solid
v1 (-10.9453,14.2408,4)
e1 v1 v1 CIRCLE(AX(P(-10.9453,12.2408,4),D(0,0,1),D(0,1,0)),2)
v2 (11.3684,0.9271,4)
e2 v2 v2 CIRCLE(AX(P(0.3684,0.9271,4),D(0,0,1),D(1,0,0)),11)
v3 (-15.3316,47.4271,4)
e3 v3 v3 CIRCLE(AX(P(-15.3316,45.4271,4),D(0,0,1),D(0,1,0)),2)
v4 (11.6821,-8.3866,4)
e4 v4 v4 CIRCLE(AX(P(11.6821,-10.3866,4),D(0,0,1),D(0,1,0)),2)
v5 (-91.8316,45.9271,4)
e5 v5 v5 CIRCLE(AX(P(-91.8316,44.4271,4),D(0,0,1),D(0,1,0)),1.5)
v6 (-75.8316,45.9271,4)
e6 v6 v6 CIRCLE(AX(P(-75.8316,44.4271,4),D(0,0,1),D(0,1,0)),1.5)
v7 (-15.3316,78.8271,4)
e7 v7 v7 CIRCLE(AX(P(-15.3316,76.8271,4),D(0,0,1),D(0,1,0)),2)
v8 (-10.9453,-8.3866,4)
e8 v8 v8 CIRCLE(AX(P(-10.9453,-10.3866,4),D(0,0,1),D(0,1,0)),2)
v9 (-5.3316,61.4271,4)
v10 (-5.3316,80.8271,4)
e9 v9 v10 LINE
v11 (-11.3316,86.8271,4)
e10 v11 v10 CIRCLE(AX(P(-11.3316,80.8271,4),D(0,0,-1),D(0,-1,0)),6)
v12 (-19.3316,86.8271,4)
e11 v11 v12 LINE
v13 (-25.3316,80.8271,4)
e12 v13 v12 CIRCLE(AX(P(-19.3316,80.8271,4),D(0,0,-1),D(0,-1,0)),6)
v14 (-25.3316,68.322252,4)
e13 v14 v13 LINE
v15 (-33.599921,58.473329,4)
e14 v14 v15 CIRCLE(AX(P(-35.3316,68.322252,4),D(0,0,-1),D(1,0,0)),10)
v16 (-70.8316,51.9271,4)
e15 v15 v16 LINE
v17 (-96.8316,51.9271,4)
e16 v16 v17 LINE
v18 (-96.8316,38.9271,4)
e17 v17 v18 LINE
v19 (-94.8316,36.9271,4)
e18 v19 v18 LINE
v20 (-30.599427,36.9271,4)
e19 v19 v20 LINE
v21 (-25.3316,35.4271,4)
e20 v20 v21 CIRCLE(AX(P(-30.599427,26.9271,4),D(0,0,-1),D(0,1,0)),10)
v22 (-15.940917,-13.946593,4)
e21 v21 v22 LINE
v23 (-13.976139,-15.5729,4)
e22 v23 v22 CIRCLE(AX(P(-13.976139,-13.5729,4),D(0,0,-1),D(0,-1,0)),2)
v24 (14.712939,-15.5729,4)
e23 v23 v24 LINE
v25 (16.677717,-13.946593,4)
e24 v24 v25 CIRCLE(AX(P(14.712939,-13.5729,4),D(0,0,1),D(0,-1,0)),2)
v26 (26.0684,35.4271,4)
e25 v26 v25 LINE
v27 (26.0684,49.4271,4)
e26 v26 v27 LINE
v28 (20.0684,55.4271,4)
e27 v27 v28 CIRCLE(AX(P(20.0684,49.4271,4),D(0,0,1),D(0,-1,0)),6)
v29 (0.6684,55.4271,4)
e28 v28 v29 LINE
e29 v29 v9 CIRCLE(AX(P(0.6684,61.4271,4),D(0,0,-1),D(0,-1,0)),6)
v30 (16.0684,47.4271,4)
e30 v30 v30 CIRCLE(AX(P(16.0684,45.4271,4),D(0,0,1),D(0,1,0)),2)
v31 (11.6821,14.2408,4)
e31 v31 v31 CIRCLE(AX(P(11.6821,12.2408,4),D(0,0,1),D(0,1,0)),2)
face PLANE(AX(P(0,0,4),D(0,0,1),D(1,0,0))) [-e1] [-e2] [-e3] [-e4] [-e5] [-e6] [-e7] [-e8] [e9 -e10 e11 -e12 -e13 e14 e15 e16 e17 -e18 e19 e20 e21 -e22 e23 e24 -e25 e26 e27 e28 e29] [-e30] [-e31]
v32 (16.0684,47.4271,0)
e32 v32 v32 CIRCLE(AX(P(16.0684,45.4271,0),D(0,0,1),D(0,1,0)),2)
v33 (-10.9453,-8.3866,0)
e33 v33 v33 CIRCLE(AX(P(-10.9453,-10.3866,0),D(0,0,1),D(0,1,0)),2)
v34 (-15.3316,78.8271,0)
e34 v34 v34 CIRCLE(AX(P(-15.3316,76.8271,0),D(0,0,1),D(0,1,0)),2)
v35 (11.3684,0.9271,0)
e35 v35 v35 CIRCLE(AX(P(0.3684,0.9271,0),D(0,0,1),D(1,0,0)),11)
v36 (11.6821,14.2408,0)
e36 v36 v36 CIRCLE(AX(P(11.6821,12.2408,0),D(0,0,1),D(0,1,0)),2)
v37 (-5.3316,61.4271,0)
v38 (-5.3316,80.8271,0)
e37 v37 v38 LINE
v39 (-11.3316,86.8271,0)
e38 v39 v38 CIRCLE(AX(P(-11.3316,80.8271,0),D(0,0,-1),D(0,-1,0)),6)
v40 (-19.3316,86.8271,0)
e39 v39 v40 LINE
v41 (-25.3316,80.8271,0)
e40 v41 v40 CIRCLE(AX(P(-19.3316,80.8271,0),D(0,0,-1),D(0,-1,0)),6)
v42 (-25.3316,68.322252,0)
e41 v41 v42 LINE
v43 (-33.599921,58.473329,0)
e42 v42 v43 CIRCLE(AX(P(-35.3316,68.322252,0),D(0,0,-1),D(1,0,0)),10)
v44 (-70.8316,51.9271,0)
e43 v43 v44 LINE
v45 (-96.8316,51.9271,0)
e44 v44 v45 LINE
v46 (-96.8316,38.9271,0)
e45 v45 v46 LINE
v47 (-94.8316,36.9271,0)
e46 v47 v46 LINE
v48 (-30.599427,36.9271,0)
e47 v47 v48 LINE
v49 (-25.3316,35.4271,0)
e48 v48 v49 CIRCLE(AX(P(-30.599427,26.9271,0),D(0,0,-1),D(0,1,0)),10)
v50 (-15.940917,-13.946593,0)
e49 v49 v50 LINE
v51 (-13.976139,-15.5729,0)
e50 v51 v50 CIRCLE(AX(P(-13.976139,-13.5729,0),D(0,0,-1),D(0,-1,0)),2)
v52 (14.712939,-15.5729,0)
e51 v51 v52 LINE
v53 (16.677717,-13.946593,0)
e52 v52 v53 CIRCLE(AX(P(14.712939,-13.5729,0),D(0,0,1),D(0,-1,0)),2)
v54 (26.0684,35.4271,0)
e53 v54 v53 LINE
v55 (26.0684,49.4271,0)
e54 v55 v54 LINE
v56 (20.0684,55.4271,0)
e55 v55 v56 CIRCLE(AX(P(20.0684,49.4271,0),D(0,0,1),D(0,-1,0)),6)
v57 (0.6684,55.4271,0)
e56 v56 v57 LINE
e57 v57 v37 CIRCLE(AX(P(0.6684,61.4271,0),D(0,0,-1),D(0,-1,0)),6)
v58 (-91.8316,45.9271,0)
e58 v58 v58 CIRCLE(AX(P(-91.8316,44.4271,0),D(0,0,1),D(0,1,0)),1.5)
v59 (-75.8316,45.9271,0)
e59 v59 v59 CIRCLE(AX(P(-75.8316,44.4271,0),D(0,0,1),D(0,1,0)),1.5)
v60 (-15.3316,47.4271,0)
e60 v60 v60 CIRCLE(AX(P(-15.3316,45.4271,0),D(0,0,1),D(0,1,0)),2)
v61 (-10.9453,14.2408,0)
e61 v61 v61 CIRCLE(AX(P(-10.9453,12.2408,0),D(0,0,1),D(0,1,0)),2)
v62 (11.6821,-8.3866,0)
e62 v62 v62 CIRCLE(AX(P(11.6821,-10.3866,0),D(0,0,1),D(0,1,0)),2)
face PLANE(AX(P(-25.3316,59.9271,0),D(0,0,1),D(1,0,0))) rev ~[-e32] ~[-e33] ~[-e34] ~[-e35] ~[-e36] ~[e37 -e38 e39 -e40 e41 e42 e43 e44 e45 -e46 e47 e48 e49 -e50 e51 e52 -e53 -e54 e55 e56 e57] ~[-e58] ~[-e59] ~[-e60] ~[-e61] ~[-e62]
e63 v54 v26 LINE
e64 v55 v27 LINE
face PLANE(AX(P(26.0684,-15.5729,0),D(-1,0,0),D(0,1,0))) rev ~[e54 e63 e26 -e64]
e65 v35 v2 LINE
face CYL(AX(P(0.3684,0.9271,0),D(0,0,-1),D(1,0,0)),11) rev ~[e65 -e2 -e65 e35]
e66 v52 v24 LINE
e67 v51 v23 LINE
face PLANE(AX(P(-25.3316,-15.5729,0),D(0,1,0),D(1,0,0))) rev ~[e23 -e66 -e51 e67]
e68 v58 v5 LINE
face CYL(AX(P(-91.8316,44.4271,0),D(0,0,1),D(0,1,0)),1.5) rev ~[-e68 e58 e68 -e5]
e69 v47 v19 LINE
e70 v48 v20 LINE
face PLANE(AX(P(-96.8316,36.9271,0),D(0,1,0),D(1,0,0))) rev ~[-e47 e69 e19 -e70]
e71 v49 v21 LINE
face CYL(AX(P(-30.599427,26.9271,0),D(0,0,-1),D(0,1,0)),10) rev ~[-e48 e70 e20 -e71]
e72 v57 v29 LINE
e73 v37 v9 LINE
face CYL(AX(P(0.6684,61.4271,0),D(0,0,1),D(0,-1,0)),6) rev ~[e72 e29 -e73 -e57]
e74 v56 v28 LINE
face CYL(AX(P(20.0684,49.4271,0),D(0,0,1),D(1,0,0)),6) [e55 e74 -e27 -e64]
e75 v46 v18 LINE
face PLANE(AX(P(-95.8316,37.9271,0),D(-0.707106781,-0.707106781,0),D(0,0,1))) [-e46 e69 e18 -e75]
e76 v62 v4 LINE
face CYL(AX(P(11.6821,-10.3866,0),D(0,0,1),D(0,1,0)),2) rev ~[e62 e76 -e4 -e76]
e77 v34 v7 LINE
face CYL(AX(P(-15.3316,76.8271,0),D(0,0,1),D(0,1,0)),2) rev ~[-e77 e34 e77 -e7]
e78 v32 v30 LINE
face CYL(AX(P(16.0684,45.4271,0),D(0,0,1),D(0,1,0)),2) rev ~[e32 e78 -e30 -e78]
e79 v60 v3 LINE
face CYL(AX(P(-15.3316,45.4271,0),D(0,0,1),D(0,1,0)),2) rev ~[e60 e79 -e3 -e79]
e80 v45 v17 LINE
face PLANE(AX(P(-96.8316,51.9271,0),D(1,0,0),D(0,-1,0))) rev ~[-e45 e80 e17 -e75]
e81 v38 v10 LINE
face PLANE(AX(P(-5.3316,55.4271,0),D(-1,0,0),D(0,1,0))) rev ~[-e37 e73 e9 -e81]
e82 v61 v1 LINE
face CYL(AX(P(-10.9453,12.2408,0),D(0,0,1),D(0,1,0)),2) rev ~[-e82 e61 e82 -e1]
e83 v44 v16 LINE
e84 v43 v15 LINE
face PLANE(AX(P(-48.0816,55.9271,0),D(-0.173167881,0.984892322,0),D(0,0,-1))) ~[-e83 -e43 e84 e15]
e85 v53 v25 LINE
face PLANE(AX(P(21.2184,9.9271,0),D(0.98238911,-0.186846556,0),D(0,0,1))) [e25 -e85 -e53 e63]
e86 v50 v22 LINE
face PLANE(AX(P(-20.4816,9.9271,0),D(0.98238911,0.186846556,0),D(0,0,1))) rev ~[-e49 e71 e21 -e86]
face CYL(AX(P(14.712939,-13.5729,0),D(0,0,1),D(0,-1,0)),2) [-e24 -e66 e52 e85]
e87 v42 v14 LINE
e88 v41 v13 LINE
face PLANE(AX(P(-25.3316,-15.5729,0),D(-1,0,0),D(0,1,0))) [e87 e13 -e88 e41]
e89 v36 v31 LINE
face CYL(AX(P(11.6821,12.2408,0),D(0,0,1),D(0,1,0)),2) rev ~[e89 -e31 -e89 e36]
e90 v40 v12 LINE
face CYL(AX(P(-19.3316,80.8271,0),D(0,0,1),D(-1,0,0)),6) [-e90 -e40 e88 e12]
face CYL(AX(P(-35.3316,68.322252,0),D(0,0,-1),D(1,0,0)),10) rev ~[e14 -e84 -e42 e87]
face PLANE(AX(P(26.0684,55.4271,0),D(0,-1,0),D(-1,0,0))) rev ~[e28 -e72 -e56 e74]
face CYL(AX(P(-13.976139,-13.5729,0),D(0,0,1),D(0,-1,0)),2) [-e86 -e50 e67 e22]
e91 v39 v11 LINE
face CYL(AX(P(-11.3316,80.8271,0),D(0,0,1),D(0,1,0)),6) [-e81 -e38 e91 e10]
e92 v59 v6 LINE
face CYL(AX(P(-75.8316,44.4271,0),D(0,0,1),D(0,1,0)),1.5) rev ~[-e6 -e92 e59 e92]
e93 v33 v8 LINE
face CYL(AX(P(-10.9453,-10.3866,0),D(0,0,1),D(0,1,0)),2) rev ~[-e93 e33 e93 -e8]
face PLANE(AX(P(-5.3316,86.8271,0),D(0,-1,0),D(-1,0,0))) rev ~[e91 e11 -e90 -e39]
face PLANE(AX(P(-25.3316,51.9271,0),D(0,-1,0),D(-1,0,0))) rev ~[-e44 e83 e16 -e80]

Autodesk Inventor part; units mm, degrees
ref_plane "YZ Plane" through (0, 0, 0) normal (1, 0, 0) x (0, 1, 0)
ref_plane "XZ Plane" through (0, 0, 0) normal (0, 1, 0) x (-1, 0, 0)
ref_plane "XY Plane" through (0, 0, 0) normal (0, 0, 1) x (1, 0, 0)
sketch "Szkic1" plane through (0, 0, 0) normal (0, 0, 1) x (1, 0, 0)
  line L0 (-25.3316, -15.5729) -> (26.0684, -15.5729)
  line L1 (26.0684, -15.5729) -> (26.0684, 35.4271)
  line L2 (26.0684, 35.4271) -> (26.0684, 35.4271)
  line L3 (26.0684, 35.4271) -> (26.0684, 55.4271)
  line L4 (26.0684, 55.4271) -> (-5.3316, 55.4271)
  line L5 (-5.3316, 55.4271) -> (-5.3316, 86.8271)
  line L6 (-5.3316, 86.8271) -> (-25.3316, 86.8271)
  line L7 (-25.3316, -15.5729) -> (-25.3316, 86.8271)
  line L8 (-15.6316, 16.9271) -> (16.3684, 16.9271)
  line L9 (16.3684, 16.9271) -> (16.3684, -15.0729)
  line L10 (16.3684, -15.0729) -> (-15.6316, -15.0729)
  line L11 (-15.6316, -15.0729) -> (-15.6316, 16.9271)
  circle A0 centre (0.3684, 0.9271) radius 11
  circle A1 centre (0.3684, 0.9271) radius 16
  line L12 (-25.3316, 51.9271) -> (-96.8316, 51.9271)
  line L13 (-96.8316, 51.9271) -> (-96.8316, 36.9271)
  line L14 (-96.8316, 36.9271) -> (-25.3316, 36.9271)
  line L15 (-25.3316, 36.9271) -> (-25.3316, 51.9271)
  point P0 (0, 0)
  point P1 (-10.9453, 12.2408)
  point P2 (11.6821, 12.2408)
  point P3 (11.6821, -10.3866)
  point P4 (-10.9453, -10.3866)
  point P5 (16.0684, 45.4271)
  point P6 (-15.3316, 76.8271)
  point P7 (-15.3316, 45.4271)
  point P8 (-91.8316, 44.4271)
  point P9 (-75.8316, 44.4271)
  dimension "d0" = 20
  dimension "d1" = 20
  dimension "d2" = 51.4
  dimension "d3" = 51.4
  dimension "d4" = 34.5
  dimension "d5" = 25.7
  dimension "d6" = 51.4
  dimension "d7" = 51
  dimension "d8" = 32
  dimension "d9" = 32
  dimension "d10" = 16
  dimension "d11" = 16
  dimension "d12" = 22
  dimension "d13" = 32
  dimension "d23" = 10
  dimension "d24" = 10
  dimension "d25" = 10
  dimension "d26" = 10
  dimension "d27" = 10
  dimension "d28" = 10
  dimension "d45" = 71.5
  dimension "d46" = 15
  dimension "d47" = 18.5
  dimension "d57" = 5
  dimension "d58" = 16
  dimension "d59" = 7.5
  dimension "d60" = 7.5
extrude "Wyciągnięcie proste1" add sketch "Szkic1" along normal blind 4 contours L7 L6 L5 L4 L3 L1 L0 | L8 A1 L11 | L8 L9 A1 | A1 | A1 L10 L11 | L9 L10 A1
hole "Otwór1" at (0.3684, 0.9271, 0) at (-10.9453, 12.2408, 0) at (11.6821, 12.2408, 0) at (11.6821, -10.3866, 0) at (-10.9453, -10.3866, 0) direction (0, 0, 1) diameter 4 end through all
hole "Otwór2" at (16.0684, 45.4271, 0) at (-15.3316, 76.8271, 0) at (-15.3316, 45.4271, 0) direction (0, 0, 1) diameter 4 end through all
chamfer "Faza1" distance 51 distance2 9.7 1 edges at (-25.3316, -15.5729, 2) measured on face at (-25.3316, 18.5605, 1.3333)
chamfer "Faza2" distance 51 distance2 9.7 1 edges at (26.0684, -15.5729, 2) measured on face at (26.0684, 31.7605, 1.3333)
fillet "Zaokrąglenie1" radius 2 2 edges at (-15.6316, -15.5729, 2) (16.3684, -15.5729, 2)
fillet "Zaokrąglenie2" radius 6 4 edges at (-5.3316, 55.4271, 2) (26.0684, 55.4271, 2) (-5.3316, 86.8271, 2) (-25.3316, 86.8271, 2)
extrude "Wyciągnięcie proste2" add sketch "Szkic1" along normal blind 4 contours L14 L13 L12 L7
chamfer "Faza3" distance 8 distance2 45.5 1 edges at (-25.3316, 51.9271, 2) measured on face at (-25.3316, 61.5605, 1.3333)
fillet "Zaokrąglenie4" radius 10 2 edges at (-25.3316, 59.9271, 2) (-25.3316, 36.9271, 2)
chamfer "Faza4" distance 2 angle 45 1 edges at (-96.8316, 36.9271, 2)
hole "Otwór3" at (-91.8316, 44.4271, 0) at (-75.8316, 44.4271, 0) direction (0, 0, 1) diameter 3 end through all
equation "\"d1\" = d0"
equation "\"d2\" = d6"
equation "\"d3\" = d6"
equation "\"d6\" = 2 * d5"
equation "\"d10\" = 0.5 * d9"
equation "\"d11\" = 0.5 * d8"
equation "\"d25\" = 0.5 * d1"
equation "\"d26\" = 0.5 * d0"
equation "\"d27\" = d25"
equation "\"d28\" = d26"
properties part number "LC_ALU_4mm_Heatbed_Frame_Linear_Bearing_Mounting_Bracket_Cable_Chain"
